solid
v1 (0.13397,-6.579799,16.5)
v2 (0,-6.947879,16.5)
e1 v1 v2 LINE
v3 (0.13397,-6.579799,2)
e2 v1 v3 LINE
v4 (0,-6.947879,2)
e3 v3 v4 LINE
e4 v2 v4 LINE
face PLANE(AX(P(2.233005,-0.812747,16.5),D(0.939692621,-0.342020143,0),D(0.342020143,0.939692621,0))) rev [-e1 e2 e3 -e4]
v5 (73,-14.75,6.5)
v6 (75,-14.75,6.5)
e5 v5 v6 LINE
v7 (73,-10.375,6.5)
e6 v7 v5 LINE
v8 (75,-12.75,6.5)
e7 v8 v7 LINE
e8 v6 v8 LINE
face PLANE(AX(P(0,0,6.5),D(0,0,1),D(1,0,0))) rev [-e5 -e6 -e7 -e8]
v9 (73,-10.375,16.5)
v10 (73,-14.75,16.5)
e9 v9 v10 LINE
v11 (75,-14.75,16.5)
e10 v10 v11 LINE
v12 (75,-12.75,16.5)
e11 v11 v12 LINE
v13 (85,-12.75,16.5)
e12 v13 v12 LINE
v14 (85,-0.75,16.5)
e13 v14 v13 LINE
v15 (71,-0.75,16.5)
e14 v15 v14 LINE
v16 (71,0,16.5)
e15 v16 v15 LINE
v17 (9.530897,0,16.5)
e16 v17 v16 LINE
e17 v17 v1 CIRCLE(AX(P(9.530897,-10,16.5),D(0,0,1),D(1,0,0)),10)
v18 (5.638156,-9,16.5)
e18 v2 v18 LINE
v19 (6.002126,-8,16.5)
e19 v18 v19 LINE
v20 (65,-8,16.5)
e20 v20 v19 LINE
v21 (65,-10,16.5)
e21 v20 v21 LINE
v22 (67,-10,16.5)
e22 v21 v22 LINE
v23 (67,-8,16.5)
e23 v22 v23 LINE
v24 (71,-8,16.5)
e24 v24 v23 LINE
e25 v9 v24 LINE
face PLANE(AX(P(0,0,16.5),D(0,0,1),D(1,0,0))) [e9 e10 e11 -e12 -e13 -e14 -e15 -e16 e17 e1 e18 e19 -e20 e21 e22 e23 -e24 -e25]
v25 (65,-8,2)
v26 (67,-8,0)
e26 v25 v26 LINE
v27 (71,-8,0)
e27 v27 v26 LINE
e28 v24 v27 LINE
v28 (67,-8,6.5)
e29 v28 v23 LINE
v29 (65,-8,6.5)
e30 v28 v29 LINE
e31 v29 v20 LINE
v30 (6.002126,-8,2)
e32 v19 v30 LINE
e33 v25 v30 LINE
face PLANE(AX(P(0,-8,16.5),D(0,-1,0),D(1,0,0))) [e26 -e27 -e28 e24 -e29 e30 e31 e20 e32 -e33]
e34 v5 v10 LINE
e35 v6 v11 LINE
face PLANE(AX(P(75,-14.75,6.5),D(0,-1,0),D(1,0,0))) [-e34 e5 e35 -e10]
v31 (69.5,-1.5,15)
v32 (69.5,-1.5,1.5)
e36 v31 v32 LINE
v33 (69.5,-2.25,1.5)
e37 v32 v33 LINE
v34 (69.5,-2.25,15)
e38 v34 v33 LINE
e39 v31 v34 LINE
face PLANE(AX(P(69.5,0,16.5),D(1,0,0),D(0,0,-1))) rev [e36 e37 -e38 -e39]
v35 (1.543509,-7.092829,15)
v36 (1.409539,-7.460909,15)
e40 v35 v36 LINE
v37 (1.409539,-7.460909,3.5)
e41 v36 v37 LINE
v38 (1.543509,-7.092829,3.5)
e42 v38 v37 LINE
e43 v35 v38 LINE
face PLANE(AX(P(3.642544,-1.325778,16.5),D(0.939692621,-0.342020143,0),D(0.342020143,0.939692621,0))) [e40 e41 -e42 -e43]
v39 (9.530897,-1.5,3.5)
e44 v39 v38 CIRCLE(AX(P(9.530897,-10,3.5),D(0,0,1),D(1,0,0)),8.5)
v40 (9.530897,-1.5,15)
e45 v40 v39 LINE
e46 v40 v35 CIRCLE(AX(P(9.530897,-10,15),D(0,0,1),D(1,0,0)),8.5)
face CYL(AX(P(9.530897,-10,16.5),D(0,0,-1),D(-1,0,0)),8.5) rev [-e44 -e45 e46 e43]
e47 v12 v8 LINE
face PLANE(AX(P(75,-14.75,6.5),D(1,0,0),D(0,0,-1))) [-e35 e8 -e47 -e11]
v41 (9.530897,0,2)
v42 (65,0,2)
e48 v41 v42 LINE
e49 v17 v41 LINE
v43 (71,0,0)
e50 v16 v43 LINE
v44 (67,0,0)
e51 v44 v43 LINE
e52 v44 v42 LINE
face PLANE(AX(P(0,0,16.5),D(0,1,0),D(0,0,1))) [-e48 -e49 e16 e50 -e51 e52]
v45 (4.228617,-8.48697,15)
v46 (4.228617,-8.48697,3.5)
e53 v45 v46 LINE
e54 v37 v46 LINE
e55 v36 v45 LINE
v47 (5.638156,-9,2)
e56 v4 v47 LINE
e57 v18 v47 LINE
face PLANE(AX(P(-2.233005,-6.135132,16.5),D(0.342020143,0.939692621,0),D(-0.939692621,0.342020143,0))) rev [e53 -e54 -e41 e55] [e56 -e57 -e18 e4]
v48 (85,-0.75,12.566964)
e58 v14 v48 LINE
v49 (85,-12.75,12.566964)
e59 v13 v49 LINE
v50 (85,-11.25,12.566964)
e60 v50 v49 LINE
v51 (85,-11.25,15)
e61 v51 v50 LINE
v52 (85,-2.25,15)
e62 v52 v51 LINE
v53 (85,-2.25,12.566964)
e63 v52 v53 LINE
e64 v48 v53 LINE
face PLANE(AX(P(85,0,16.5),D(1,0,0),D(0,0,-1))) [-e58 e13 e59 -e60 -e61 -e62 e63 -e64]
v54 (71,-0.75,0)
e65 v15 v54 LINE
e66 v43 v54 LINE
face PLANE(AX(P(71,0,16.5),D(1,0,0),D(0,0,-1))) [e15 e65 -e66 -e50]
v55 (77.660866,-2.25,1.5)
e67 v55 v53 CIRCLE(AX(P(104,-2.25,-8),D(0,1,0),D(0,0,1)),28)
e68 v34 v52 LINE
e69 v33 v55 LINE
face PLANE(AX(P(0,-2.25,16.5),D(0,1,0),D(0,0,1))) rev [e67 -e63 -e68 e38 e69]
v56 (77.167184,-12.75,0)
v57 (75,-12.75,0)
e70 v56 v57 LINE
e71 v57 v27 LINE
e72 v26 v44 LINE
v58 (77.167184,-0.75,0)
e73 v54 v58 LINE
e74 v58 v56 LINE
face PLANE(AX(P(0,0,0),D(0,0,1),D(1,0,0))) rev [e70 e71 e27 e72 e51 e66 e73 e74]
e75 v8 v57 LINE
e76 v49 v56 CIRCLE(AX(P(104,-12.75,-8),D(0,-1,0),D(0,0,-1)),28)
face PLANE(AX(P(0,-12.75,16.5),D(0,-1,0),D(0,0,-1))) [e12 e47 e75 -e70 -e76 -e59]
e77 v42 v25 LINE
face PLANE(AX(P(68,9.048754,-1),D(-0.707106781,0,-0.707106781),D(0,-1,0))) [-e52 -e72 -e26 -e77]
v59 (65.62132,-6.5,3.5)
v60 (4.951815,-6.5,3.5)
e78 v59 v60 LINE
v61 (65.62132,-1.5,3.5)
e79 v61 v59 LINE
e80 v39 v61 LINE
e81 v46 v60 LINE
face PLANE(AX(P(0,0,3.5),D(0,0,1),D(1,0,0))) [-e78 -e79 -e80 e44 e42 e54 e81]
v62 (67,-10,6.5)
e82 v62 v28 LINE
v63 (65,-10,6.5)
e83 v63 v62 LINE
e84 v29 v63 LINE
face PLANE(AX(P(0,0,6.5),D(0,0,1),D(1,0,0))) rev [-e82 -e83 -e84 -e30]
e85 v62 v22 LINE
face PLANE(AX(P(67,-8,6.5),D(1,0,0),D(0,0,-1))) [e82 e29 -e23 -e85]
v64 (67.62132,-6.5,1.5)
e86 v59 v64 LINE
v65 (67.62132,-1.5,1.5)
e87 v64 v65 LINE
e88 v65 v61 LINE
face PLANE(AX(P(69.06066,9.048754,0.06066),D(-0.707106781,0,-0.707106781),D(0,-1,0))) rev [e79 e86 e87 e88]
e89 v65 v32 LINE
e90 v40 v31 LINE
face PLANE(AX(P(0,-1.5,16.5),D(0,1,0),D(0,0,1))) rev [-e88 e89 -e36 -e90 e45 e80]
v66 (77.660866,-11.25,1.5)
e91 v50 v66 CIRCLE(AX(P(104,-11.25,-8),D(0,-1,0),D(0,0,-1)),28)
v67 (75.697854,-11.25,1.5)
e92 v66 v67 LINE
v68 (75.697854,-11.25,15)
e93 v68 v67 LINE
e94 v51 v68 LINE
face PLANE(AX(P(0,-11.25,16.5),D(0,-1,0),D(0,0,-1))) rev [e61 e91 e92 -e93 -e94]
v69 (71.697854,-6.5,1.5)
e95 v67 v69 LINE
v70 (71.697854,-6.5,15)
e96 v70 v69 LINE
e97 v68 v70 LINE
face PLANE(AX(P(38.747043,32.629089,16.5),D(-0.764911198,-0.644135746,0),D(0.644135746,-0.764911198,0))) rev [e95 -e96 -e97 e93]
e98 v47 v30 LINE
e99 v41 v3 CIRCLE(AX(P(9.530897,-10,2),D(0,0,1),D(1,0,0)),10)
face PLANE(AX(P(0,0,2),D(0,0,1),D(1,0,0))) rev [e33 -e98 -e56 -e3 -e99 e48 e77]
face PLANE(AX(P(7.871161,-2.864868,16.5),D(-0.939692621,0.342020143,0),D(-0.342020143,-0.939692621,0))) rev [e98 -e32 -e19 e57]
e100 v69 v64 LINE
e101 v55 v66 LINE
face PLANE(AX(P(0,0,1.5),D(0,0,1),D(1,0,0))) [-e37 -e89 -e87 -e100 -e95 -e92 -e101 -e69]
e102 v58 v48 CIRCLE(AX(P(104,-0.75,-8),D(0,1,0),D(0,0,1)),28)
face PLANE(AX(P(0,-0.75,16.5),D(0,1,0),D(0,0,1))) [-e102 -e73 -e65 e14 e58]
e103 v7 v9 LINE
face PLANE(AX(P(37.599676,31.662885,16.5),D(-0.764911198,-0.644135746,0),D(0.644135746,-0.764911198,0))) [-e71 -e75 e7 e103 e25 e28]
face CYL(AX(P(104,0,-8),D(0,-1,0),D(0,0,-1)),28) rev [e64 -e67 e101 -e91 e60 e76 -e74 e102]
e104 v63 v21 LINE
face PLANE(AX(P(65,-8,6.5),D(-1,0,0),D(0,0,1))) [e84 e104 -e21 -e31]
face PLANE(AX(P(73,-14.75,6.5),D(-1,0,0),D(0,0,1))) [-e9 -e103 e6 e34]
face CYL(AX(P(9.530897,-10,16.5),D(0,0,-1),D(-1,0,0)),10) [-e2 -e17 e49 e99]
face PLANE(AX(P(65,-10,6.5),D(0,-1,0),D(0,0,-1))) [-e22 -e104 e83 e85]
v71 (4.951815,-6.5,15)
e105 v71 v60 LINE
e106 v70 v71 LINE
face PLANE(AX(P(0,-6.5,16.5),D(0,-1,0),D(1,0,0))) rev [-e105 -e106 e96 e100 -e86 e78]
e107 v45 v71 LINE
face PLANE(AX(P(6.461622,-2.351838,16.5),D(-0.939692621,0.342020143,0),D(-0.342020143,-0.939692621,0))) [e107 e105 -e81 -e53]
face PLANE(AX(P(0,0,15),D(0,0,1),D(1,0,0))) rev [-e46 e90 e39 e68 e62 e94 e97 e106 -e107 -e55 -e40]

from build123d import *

# Parameters (mm, degrees)
RESSALTO_EXTRUS_O1_DEPTH = 16.5
CORTE_EXTRUS_O1_START    = -14.5
ESBO_O2_W                = 84.883298415
ESBO_O2_H                = 23.037156827
CORTE_EXTRUS_O1_DEPTH    = 14.5
CHANFRO1_SIZE            = 3
CASCA1_T                 = -1.5
CORTE_EXTRUS_O2_DEPTH    = 88.520354775
ESBO_O5_W                = 2
ESBO_O5_H                = 2
RESSALTO_EXTRUS_O2_DEPTH = 10


with BuildPart() as part:
    # Esboço1 → Ressalto-extrusão1 (new body)
    with BuildSketch(Plane.XY):
        with BuildLine():
            Line((9.53089658, 0), (71, 0))
            Line((71, 0), (71, -0.75))
            Line((71, -0.75), (85, -0.75))
            Line((85, -0.75), (85, -12.75))
            Line((85, -12.75), (75, -12.75))
            Line((75, -12.75), (71, -8))
            Line((71, -8), (6.002125959, -8))
            Line((6.002125959, -8), (5.638155725, -9))
            Line((5.638155725, -9), (0, -6.94787914))
            Line((0, -6.94787914), (0.133970372, -6.579798567))
            ThreePointArc((0.133970372, -6.579798567), (3.795132217, -1.808479557), (9.53089658, 0))
        make_face()
    extrude(amount=RESSALTO_EXTRUS_O1_DEPTH)

    # Esboço2 → Corte-extrusão1 (cut)
    with BuildSketch(Plane.XY.offset(16.5).offset(CORTE_EXTRUS_O1_START)):
        with Locations((25.558350793, -2.469824016)):
            Rectangle(ESBO_O2_W, ESBO_O2_H)
    extrude(amount=-CORTE_EXTRUS_O1_DEPTH, mode=Mode.SUBTRACT)

    # Chanfro1
    # the kernel refuses this chamfer: 3 mm, written as the material it adds along each edge
    with BuildSketch(Plane(origin=(68, 0, 2), x_dir=(-0.9996219169112968, 0, 0.027495876610586334), z_dir=(0, -1, 0))) as chanfro1_piece_1_section:
        Polygon((CHANFRO1_SIZE * 0.999621916911, CHANFRO1_SIZE * 0.0274958766106), (-CHANFRO1_SIZE * 0.0274958766106, CHANFRO1_SIZE * 0.999621916911), (0, 0), align=None)
    chanfro1_piece_1 = extrude(amount=8, mode=Mode.PRIVATE)
    chanfro1_piece_1 = split(chanfro1_piece_1, bisect_by=Plane(origin=(66.907908995, -4, 0), z_dir=(0, 0, 1)), keep=Keep.TOP, mode=Mode.PRIVATE)
    add(chanfro1_piece_1)

    # Casca1
    casca1_openings = [part.faces().sort_by_distance(p)[0] for p in [
        (85, -6.75, 8.25),
        (2.819077862, -7.97393957, 9.25),
    ]]
    offset(amount=CASCA1_T, openings=casca1_openings, kind=Kind.INTERSECTION)

    # Esboço4 → Corte-extrusão2 (cut, through all)
    with BuildSketch(Plane.XZ.offset(12.75)):
        with BuildLine():
            Line((77.16718427, 0), (85, 0))
            Line((85, 0), (85, 12.566963801))
            ThreePointArc((85, 12.566963801), (80.237763274, 6.810675399), (77.16718427, 0))
        make_face()
    extrude(amount=-CORTE_EXTRUS_O2_DEPTH, mode=Mode.SUBTRACT)

    # Esboço5 → Ressalto-extrusão2 (add)
    with BuildSketch(Plane.XY.offset(16.5)):
        with Locations((66, -9)):
            Rectangle(ESBO_O5_W, ESBO_O5_H)
        Polygon((75, -14.75), (73, -14.75), (73, -10.375), (75, -12.75), align=None)
    extrude(amount=-RESSALTO_EXTRUS_O2_DEPTH)


solid = part.part
